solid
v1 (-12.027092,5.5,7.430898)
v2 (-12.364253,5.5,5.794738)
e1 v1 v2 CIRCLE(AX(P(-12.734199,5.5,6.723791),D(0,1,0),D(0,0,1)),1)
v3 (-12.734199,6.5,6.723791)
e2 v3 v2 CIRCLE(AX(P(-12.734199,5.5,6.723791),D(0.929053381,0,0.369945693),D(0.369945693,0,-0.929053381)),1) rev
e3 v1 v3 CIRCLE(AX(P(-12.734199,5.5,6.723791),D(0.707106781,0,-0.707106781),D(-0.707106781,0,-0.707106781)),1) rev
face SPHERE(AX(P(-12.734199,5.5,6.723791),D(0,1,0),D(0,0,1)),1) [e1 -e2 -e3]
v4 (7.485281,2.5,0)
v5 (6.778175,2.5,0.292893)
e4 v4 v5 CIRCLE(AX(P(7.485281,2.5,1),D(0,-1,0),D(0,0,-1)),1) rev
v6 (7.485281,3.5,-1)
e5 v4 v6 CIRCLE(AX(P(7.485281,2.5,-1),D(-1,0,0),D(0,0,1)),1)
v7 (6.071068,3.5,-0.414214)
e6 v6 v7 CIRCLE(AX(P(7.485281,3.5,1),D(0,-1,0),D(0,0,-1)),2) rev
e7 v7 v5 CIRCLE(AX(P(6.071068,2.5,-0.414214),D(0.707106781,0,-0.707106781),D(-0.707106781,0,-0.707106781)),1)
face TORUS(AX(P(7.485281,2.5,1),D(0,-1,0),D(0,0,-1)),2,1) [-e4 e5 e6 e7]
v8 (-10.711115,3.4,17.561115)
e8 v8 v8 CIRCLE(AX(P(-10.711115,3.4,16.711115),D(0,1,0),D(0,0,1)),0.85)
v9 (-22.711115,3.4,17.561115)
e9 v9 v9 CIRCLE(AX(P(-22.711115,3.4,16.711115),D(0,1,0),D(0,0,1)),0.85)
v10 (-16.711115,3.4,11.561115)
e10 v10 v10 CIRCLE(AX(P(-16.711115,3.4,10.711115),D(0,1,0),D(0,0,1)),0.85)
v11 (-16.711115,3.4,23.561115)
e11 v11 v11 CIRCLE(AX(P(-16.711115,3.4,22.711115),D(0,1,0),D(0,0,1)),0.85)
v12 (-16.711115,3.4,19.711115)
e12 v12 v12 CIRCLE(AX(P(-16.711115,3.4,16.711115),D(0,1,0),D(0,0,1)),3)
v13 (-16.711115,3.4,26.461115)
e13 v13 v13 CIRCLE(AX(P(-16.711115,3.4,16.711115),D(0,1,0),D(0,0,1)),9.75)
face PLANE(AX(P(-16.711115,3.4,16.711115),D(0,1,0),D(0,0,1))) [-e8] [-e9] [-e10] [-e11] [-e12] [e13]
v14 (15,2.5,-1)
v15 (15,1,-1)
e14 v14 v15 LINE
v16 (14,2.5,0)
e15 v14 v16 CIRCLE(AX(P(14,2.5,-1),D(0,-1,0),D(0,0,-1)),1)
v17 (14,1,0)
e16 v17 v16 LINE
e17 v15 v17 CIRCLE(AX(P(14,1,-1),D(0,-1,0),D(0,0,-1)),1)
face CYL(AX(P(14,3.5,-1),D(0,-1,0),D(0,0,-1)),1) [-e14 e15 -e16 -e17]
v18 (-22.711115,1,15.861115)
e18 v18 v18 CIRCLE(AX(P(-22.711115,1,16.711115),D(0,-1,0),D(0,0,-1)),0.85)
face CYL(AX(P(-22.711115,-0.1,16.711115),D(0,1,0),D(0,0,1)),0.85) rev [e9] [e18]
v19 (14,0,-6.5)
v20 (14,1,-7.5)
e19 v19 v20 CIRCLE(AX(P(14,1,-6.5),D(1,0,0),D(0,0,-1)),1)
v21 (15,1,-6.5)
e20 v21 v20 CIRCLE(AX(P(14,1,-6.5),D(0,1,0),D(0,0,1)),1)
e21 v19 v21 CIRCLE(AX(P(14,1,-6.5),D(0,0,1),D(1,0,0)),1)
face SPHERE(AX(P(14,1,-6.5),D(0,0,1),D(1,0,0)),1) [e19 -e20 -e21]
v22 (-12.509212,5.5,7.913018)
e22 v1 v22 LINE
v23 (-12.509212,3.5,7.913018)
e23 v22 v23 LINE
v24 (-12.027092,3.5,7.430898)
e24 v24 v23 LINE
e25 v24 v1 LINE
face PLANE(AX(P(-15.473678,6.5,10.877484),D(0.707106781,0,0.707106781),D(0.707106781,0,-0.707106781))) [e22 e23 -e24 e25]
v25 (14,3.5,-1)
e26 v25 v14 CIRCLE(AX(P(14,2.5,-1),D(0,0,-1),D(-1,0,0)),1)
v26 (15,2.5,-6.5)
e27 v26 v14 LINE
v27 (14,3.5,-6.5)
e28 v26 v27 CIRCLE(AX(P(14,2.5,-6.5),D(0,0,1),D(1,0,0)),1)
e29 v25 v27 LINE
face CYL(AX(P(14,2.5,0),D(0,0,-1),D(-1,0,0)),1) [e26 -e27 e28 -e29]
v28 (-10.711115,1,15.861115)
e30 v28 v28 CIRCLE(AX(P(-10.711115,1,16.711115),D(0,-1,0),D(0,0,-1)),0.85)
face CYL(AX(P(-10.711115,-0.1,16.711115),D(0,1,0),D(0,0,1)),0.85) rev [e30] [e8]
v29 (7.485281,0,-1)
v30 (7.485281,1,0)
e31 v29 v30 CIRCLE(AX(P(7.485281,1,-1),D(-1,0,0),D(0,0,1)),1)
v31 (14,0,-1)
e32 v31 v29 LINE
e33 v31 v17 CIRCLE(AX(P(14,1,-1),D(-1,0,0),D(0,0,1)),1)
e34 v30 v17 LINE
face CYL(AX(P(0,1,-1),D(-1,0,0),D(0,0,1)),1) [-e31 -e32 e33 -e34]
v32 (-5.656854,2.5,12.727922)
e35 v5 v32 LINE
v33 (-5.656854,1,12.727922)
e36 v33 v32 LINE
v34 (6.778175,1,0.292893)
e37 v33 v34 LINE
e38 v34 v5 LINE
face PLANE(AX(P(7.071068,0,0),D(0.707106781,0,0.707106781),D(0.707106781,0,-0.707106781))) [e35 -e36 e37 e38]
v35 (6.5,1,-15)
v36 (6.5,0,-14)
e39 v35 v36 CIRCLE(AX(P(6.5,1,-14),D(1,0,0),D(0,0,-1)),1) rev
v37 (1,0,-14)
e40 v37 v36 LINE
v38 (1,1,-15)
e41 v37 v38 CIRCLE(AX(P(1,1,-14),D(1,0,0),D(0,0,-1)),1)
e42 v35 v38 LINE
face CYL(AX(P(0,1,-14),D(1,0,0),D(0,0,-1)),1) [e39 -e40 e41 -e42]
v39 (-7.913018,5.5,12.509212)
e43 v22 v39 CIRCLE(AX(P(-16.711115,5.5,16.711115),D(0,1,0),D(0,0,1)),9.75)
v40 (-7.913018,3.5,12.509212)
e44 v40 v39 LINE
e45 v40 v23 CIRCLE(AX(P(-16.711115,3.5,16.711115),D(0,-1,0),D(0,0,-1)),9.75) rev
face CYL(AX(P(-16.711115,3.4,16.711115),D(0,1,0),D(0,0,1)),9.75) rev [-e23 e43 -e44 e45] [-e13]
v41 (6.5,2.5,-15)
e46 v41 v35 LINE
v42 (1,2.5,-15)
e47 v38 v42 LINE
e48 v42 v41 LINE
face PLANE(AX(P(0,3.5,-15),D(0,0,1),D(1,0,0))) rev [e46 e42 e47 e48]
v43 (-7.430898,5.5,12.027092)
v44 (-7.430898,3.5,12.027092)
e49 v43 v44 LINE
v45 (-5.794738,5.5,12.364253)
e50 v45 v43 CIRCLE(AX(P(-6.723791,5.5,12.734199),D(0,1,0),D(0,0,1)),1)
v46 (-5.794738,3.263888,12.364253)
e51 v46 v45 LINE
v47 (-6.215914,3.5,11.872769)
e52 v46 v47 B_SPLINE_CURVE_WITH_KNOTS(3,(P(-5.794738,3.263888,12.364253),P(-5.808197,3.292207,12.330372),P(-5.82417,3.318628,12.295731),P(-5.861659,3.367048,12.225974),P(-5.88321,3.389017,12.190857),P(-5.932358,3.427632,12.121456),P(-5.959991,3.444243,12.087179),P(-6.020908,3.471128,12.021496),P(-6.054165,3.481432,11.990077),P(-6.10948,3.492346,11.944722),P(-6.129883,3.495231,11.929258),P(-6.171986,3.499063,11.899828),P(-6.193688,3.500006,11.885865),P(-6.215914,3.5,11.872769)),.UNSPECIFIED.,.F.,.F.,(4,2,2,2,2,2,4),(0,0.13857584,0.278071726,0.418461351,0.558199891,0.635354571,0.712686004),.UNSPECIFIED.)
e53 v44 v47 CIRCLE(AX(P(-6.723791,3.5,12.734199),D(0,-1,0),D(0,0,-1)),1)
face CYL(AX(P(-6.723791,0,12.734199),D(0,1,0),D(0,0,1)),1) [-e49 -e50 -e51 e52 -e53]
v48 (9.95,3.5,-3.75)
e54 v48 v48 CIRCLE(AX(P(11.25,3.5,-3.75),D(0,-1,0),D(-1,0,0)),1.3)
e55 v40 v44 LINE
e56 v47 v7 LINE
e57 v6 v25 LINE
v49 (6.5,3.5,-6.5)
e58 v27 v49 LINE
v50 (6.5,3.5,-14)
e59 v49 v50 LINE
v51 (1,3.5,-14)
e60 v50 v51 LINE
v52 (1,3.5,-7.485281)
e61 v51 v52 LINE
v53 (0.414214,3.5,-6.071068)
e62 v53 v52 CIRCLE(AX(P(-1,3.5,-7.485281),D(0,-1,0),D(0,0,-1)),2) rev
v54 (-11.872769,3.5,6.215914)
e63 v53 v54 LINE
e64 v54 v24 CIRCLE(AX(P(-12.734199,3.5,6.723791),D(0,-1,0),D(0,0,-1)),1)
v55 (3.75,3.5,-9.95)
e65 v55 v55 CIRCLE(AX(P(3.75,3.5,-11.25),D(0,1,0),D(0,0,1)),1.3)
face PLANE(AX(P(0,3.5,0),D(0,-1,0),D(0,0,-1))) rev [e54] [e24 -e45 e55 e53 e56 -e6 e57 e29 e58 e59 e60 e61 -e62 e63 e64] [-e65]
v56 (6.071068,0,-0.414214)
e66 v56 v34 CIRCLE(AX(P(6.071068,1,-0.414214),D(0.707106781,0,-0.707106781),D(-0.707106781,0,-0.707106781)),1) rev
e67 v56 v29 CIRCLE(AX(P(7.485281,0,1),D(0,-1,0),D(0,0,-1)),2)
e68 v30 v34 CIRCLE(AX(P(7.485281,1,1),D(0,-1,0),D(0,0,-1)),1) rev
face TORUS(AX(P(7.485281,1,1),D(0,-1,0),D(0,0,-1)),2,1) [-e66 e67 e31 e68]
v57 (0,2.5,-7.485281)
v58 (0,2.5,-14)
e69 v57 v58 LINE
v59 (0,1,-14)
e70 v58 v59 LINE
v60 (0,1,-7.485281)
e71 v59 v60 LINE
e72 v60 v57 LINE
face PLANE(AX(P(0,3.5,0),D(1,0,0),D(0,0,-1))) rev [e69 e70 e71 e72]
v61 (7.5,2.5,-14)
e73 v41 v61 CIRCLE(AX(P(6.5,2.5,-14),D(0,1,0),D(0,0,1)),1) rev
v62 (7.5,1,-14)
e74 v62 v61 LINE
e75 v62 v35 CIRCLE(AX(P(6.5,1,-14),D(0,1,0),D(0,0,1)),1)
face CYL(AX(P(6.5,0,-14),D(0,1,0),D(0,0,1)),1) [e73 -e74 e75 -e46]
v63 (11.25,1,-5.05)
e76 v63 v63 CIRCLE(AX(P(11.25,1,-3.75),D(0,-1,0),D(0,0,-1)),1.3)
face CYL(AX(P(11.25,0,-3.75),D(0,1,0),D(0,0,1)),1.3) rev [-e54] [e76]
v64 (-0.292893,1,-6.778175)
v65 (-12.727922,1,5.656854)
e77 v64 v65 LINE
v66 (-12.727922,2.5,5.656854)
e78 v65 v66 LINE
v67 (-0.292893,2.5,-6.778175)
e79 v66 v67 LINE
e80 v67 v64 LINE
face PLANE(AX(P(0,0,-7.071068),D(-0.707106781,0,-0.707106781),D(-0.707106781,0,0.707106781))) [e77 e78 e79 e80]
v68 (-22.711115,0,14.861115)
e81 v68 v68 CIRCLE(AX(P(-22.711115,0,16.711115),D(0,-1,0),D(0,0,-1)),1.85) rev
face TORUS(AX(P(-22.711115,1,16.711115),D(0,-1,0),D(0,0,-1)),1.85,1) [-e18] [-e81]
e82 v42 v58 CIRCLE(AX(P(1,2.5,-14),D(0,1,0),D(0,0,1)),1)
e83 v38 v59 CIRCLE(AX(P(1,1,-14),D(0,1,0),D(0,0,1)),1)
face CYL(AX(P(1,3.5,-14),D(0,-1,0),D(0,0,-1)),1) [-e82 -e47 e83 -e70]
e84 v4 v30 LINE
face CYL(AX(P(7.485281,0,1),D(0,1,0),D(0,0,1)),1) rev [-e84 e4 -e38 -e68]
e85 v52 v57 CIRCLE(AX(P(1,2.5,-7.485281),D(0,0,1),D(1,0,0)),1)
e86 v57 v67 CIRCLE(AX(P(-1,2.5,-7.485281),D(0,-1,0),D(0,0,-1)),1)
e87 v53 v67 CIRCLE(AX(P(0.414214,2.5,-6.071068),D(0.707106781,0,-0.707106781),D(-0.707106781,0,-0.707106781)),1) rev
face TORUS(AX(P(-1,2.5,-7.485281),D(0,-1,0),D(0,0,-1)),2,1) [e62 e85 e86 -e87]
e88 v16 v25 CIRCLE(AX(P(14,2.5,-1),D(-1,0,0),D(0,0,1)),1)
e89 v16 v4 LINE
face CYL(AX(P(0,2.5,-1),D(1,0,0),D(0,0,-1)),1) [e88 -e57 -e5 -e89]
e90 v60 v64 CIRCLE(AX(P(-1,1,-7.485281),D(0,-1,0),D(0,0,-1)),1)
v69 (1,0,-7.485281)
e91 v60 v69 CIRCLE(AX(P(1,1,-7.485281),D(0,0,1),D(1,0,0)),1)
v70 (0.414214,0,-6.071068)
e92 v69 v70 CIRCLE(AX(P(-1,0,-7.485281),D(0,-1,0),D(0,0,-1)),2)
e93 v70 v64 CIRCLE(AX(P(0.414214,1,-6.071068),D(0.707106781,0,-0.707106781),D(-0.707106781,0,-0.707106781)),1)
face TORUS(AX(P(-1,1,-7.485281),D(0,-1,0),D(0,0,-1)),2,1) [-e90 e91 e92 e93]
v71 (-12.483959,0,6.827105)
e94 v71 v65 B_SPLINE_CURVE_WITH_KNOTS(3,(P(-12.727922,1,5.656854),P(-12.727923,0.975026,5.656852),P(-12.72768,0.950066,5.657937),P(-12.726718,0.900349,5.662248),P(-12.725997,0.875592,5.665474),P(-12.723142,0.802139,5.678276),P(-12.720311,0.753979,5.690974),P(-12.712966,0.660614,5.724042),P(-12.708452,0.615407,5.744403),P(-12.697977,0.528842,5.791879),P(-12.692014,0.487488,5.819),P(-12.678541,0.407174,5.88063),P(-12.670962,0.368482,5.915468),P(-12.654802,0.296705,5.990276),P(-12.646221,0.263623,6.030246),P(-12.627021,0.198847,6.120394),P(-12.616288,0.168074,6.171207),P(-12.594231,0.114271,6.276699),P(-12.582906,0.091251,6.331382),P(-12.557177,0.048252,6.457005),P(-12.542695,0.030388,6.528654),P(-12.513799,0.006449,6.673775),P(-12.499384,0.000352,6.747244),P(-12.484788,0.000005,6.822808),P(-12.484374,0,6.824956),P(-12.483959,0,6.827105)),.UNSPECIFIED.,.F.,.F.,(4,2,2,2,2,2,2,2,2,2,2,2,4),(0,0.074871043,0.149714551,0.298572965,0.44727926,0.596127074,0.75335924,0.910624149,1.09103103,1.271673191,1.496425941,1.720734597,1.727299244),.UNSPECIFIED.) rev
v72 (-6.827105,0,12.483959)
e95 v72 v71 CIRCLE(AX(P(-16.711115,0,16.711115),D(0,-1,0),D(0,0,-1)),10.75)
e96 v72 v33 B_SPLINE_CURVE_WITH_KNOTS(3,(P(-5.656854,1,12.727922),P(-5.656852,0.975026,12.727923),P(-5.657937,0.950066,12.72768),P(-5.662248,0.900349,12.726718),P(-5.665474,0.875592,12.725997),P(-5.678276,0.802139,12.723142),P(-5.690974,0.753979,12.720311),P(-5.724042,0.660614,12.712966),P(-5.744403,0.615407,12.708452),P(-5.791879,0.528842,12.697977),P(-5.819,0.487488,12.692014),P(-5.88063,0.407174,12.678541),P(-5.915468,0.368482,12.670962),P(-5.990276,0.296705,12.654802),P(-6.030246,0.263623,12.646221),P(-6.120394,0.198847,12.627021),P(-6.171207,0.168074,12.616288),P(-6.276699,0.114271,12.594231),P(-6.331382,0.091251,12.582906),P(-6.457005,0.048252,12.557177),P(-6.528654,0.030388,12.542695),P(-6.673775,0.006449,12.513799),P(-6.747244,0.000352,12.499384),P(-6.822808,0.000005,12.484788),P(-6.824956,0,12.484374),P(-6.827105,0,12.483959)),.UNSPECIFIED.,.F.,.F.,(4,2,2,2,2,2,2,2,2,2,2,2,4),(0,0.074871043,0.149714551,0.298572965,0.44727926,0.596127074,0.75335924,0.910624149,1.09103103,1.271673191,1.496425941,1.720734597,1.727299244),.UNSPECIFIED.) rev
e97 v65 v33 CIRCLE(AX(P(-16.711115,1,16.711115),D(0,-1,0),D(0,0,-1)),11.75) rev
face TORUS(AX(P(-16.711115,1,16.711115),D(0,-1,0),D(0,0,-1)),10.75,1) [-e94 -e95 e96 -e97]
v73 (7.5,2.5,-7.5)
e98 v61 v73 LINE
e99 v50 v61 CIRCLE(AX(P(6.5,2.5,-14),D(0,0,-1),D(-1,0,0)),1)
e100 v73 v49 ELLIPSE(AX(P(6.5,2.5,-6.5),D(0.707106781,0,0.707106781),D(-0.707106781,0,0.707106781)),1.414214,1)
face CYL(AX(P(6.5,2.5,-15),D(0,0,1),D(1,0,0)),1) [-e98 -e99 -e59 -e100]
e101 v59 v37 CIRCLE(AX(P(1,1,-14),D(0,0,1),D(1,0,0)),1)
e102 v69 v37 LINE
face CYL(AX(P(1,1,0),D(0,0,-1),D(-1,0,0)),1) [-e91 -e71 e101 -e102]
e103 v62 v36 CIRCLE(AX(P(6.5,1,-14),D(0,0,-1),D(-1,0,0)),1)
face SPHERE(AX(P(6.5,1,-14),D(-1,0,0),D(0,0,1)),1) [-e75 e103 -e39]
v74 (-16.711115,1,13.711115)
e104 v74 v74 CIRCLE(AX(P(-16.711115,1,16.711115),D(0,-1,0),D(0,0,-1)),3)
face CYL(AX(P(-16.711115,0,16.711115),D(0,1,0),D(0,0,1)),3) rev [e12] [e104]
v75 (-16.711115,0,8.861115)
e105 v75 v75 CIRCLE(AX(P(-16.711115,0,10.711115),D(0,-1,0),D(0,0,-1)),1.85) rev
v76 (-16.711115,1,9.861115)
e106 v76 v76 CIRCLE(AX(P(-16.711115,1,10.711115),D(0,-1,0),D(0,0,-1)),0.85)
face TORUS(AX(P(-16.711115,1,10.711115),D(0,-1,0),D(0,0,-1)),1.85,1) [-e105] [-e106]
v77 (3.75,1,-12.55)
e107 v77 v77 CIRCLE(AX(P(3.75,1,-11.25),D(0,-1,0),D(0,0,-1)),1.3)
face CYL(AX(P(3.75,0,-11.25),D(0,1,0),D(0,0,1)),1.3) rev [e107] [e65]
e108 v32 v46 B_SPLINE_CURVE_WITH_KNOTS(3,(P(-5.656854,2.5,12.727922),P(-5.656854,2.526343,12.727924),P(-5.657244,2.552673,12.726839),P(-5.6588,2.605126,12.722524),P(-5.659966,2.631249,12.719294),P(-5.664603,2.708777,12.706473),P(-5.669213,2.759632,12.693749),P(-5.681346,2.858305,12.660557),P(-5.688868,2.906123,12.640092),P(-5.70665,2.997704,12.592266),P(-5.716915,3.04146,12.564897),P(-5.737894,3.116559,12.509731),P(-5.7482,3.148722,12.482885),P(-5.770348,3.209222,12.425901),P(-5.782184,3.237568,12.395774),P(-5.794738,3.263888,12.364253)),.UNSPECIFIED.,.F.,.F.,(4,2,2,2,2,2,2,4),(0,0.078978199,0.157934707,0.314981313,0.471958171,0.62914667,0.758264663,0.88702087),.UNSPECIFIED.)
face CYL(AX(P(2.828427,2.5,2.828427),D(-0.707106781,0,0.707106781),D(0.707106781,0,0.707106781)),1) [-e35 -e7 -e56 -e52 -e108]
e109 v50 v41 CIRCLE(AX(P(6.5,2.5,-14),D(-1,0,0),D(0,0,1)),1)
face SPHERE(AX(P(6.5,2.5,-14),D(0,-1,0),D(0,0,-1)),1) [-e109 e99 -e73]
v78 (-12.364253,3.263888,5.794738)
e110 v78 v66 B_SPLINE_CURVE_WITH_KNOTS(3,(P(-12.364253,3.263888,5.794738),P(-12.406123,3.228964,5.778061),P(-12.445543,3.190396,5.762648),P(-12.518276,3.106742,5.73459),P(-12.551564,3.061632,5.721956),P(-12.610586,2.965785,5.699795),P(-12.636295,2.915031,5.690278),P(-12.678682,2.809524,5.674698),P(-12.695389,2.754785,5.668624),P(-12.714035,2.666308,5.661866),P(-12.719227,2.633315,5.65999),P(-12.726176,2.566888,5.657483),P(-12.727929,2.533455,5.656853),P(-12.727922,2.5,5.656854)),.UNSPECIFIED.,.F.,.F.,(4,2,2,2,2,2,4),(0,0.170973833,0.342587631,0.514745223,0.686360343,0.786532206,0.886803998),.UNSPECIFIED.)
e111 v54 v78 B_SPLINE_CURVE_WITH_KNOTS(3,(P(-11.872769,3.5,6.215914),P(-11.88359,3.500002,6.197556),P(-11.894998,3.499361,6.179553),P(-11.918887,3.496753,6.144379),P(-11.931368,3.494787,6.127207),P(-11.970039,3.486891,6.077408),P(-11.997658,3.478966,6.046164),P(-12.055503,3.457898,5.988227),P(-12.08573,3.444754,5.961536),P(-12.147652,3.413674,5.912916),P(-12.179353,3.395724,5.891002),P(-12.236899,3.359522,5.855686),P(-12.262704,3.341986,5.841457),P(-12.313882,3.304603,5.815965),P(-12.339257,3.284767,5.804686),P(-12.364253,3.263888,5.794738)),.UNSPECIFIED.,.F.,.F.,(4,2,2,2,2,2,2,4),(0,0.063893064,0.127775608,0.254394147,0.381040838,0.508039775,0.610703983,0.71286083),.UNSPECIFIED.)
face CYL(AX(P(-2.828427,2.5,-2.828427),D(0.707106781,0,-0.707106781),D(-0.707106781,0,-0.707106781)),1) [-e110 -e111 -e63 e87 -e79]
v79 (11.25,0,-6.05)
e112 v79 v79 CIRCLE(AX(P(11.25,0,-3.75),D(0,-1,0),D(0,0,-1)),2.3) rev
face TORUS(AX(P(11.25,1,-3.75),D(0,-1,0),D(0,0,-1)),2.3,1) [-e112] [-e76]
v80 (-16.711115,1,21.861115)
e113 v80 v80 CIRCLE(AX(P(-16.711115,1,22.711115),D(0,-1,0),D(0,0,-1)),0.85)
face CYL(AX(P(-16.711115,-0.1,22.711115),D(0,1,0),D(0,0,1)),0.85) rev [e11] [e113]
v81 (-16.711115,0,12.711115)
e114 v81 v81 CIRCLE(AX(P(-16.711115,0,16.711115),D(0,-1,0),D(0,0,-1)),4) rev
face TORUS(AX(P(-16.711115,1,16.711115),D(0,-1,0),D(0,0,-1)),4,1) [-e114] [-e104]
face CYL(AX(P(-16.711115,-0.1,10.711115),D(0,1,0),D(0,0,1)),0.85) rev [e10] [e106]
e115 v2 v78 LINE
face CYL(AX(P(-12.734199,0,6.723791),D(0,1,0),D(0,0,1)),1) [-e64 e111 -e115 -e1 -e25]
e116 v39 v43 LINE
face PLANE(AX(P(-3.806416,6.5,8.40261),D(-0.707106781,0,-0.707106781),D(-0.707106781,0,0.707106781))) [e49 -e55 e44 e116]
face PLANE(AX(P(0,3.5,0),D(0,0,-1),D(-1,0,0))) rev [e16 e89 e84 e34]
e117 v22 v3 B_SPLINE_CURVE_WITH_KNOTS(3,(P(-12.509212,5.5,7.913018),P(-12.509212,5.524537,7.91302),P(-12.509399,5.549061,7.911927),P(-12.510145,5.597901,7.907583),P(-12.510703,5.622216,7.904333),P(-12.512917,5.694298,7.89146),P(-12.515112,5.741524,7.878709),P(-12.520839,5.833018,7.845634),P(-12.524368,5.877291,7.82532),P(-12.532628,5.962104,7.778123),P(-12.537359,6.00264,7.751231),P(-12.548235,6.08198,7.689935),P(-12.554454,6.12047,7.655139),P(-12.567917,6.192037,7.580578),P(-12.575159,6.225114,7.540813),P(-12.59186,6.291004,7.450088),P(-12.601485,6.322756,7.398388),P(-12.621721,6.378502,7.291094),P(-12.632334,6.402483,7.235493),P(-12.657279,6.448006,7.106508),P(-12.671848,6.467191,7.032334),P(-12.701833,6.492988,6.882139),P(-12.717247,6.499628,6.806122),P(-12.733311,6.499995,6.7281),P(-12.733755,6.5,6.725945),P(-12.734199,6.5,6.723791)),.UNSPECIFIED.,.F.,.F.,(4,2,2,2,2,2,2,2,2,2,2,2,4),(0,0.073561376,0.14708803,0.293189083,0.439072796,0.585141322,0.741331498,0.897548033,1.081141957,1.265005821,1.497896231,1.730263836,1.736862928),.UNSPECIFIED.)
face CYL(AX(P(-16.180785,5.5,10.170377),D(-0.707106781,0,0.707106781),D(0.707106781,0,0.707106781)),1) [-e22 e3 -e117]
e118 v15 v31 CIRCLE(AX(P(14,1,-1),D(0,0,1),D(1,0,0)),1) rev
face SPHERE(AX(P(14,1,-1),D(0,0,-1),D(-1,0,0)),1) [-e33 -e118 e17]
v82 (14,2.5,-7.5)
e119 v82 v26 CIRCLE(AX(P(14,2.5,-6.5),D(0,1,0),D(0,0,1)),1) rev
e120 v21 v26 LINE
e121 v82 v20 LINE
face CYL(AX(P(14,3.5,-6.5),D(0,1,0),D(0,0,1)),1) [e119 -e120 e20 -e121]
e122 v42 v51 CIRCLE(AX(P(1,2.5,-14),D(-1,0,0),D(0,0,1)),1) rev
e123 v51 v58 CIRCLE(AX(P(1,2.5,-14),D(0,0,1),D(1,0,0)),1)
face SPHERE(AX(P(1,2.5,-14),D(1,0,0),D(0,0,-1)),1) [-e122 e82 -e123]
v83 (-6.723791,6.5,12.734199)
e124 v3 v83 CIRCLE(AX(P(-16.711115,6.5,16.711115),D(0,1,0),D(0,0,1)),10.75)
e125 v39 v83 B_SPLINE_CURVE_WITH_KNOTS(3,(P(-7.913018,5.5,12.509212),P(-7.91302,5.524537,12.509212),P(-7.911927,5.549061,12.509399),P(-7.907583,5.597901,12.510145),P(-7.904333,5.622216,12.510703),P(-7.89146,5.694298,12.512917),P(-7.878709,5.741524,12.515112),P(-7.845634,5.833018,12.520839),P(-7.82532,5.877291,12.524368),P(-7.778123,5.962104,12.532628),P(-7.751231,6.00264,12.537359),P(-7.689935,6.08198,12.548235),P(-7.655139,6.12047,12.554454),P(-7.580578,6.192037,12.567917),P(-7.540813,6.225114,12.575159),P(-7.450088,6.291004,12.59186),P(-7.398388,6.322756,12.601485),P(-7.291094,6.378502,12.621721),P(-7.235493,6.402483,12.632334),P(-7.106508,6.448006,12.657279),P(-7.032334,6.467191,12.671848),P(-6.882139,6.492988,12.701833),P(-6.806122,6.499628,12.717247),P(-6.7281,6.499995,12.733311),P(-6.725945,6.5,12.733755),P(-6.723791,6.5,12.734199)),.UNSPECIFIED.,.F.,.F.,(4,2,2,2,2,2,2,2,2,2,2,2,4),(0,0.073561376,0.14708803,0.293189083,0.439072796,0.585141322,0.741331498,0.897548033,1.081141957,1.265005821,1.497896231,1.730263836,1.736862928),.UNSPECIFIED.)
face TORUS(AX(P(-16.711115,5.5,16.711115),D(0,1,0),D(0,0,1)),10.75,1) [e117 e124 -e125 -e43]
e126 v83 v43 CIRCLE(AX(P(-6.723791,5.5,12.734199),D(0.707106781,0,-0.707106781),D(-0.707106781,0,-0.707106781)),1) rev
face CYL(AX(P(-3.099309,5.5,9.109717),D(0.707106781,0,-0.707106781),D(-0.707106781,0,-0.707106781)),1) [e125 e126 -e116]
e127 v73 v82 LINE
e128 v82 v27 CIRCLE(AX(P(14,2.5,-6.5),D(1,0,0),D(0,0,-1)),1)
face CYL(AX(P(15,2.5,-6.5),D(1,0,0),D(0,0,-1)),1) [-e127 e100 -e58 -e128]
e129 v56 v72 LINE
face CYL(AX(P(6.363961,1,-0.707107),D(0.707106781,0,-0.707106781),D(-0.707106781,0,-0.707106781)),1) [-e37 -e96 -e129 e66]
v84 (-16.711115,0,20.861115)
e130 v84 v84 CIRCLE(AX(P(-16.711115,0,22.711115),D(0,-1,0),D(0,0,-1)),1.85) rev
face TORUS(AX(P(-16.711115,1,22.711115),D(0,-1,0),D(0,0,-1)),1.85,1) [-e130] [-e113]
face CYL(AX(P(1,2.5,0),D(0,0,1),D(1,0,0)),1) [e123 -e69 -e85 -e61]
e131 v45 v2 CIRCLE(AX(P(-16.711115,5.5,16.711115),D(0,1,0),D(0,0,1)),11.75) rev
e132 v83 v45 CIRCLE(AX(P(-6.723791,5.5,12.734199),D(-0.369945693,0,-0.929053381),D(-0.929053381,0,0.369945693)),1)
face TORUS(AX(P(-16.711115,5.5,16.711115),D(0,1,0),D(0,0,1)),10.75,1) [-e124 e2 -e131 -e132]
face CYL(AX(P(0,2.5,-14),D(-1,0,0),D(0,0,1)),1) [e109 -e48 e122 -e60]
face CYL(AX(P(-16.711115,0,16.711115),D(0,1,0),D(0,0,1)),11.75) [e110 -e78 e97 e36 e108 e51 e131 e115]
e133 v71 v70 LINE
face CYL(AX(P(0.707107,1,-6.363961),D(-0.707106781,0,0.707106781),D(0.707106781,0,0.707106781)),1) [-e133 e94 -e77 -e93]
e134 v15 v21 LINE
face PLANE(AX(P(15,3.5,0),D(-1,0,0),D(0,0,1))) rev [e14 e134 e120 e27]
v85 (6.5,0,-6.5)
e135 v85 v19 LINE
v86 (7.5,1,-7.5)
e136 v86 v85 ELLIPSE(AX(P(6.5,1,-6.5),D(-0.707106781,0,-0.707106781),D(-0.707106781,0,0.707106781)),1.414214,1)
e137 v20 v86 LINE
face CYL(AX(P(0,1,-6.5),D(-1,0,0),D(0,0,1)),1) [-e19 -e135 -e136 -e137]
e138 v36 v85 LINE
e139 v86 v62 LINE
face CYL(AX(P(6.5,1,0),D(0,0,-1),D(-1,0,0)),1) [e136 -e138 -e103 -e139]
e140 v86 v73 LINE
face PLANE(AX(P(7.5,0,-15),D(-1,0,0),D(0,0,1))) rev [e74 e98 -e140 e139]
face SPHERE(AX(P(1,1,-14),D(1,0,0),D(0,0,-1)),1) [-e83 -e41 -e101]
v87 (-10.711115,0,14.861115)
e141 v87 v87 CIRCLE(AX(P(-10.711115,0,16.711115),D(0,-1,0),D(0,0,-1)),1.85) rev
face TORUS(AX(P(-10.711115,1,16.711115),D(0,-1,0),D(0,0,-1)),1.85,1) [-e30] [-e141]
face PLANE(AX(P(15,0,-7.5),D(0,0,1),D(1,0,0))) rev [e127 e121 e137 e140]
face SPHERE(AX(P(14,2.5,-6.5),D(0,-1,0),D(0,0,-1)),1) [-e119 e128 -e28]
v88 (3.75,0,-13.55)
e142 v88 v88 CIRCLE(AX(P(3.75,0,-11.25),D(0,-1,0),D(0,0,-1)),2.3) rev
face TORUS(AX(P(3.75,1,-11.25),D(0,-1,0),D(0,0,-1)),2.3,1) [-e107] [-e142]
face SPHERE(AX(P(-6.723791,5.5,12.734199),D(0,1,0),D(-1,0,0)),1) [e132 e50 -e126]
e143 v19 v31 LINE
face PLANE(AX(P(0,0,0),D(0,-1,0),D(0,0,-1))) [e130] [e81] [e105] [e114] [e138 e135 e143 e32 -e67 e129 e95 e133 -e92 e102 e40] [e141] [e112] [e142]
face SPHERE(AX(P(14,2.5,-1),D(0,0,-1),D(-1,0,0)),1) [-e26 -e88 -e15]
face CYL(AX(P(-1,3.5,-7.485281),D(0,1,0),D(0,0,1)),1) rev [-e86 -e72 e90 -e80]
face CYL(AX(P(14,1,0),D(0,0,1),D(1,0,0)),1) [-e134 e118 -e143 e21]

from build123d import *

# Parameters (mm, degrees)
SKETCH1_W           = 15
SKETCH1_H           = 15
BOSS_EXTRUDE1_DEPTH = 3.5
SKETCH2_W           = 7.5
SKETCH2_H           = 7.5
CUT_EXTRUDE1_DEPTH  = 22.5
SKETCH3_R           = 1.3
CUT_EXTRUDE2_DEPTH  = 22.5
BOSS_EXTRUDE3_DEPTH = 3.5
SKETCH7_R           = 11.75
BOSS_EXTRUDE4_DEPTH = 3.5
BOSS_EXTRUDE5_START = 3
SKETCH8_R           = 11.75
BOSS_EXTRUDE5_DEPTH = 3
SKETCH9_R           = 9.75
CUT_EXTRUDE3_DEPTH  = 3.1
FILLET8_R           = 1
FILLET9_R           = 1
SKETCH12_R          = 3
CUT_EXTRUDE6_DEPTH  = 41.393441406
FILLET23_R          = 1
FILLET24_R          = 1
FILLET25_R          = 1
CUT_EXTRUDE7_DEPTH  = 41.401981494
FILLET31_R          = 1
FILLET32_R          = 1
SKETCH30_R          = 0.85
CUT_EXTRUDE8_DEPTH  = 3.5
FILLET33_R          = 1


with BuildPart() as part:
    # Sketch1 → Boss-Extrude1 (new body)
    with BuildSketch(Plane(origin=(0, 0, 0), x_dir=(1, 0, 0), z_dir=(0, 1, 0))):
        with Locations((7.5, 7.5)):
            Rectangle(SKETCH1_W, SKETCH1_H)
    extrude(amount=BOSS_EXTRUDE1_DEPTH)

    # Sketch2 → Cut-Extrude1 (cut, through all)
    with BuildSketch(Plane(origin=(0, 3.5, 0), x_dir=(1, 0, 0), z_dir=(0, 1, 0))):
        with Locations((11.25, 11.25)):
            Rectangle(SKETCH2_W, SKETCH2_H)
    extrude(amount=-CUT_EXTRUDE1_DEPTH, mode=Mode.SUBTRACT)

    # Sketch3 → Cut-Extrude2 (cut, through all)
    with BuildSketch(Plane(origin=(0, 3.5, 0), x_dir=(1, 0, 0), z_dir=(0, 1, 0))):
        with Locations(Location((3.75, 11.25, 0), (0, 0, 270))):
            Circle(SKETCH3_R)
    cut_extrude2 = extrude(amount=-CUT_EXTRUDE2_DEPTH, mode=Mode.SUBTRACT)

    # Mirror1: Cut-Extrude2 across plane
    add(cut_extrude2.mirror(Plane(origin=(0, 0, 0), x_dir=(-0.7071067811865475, 0, 0.7071067811865476), z_dir=(0.7071067811865478, 0, 0.7071067811865474))), mode=Mode.SUBTRACT)

    # Sketch6 → Boss-Extrude3 (add)
    with BuildSketch(Plane(origin=(0, 3.5, 0), x_dir=(1, 0, 0), z_dir=(0, 1, 0))):
        Polygon((0, 7.071067812), (-12.727922061, -5.656854249), (-5.656854249, -12.727922061), (7.071067812, 0), align=None)
    extrude(amount=-BOSS_EXTRUDE3_DEPTH)

    # Sketch7 → Boss-Extrude4 (add)
    with BuildSketch(Plane(origin=(0, 3.5, 0), x_dir=(1, 0, 0), z_dir=(0, 1, 0))):
        with Locations((-16.711114776, -16.711114776)):
            Circle(SKETCH7_R)
    extrude(amount=-BOSS_EXTRUDE4_DEPTH)

    # Sketch8 → Boss-Extrude5 (add)
    with BuildSketch(Plane(origin=(0, 3.5, 0), x_dir=(1, 0, 0), z_dir=(0, 1, 0)).offset(BOSS_EXTRUDE5_START)):
        with Locations(Location((-16.711114776, -16.711114776, 0), (0, 0, 270))):
            Circle(SKETCH8_R)
    extrude(amount=-BOSS_EXTRUDE5_DEPTH)

    # Sketch9 → Cut-Extrude3 (cut)
    with BuildSketch(Plane(origin=(0, 6.5, 0), x_dir=(1, 0, 0), z_dir=(0, 1, 0))):
        with Locations(Location((-16.711114776, -16.711114776, 0), (0, 0, 270))):
            Circle(SKETCH9_R)
    extrude(amount=-CUT_EXTRUDE3_DEPTH, mode=Mode.SUBTRACT)

    # Fillet8
    fillet8_edges = [part.edges().sort_by_distance(p)[0] for p in [
        (15, 0, -3.75),
    ]]
    fillet(fillet8_edges, radius=FILLET8_R)

    # Fillet9
    fillet9_edges = [part.edges().sort_by_distance(p)[0] for p in [
        (3.75, 0, -15),
    ]]
    fillet(fillet9_edges, radius=FILLET9_R)

    # Sketch12 → Cut-Extrude6 (cut, through all)
    with BuildSketch(Plane(origin=(0, 3.4, 0), x_dir=(1, 0, 0), z_dir=(0, 1, 0))):
        with Locations(Location((-16.711114776, -16.711114776, 0), (0, 0, 270))):
            Circle(SKETCH12_R)
    extrude(amount=-CUT_EXTRUDE6_DEPTH, mode=Mode.SUBTRACT)

    # Fillet23
    fillet23_edges = [part.edges().sort_by_distance(p)[0] for p in [
        (7.5, 2.25, -15),
        (7.5, 0, -10.75),
        (7.5, 0.292893219, -14.707106781),
    ]]
    fillet(fillet23_edges, radius=FILLET23_R)

    # Fillet24
    fillet24_edges = [part.edges().sort_by_distance(p)[0] for p in [
        (10.25, 0, -7.5),
        (15, 2.25, -7.5),
        (14.707106781, 0.292893219, -7.5),
    ]]
    fillet(fillet24_edges, radius=FILLET24_R)

    # Fillet25
    fillet25_edges = [part.edges().sort_by_distance(p)[0] for p in [
        (14.707106781, 3.5, -7.207106781),
        (15, 3.5, -3.25),
        (10.75, 3.5, -7.5),
    ]]
    fillet(fillet25_edges, radius=FILLET25_R)

    # Sketch27 → Cut-Extrude7 (cut, through all)
    with BuildSketch(Plane(origin=(0, 3.5, 0), x_dir=(1, 0, 0), z_dir=(0, 1, 0))):
        Polygon((-8.402610097, -3.80641602), (-3.80641602, -8.402610097), (-10.877483832, -15.473677909), (-15.473677909, -10.877483831), align=None)
    extrude(amount=CUT_EXTRUDE7_DEPTH, mode=Mode.SUBTRACT)

    # Fillet31
    fillet31_edges = [part.edges().sort_by_distance(p)[0] for p in [
        (3.25, 3.5, -15),
        (7.207106781, 3.5, -14.707106781),
        (7.5, 3.5, -10.25),
    ]]
    fillet(fillet31_edges, radius=FILLET31_R)

    # Fillet32
    fillet32_edges = [part.edges().sort_by_distance(p)[0] for p in [
        (-26.220161682, 6.5, 14.556926545),
        (-25.019619455, 6.5, 25.019619455),
        (-11.024852104, 5, 6.428658026),
        (-6.428658026, 5, 11.024852104),
        (-7.170837882, 6.5, 11.767031959),
        (-11.767031959, 6.5, 7.170837882),
    ]]
    fillet(fillet32_edges, radius=FILLET32_R - 0.0001)  # a hair under: the kernel refuses the full size

    # Sketch30 → Cut-Extrude8 (cut)
    with BuildSketch(Plane(origin=(0, 3.4, 0), x_dir=(1, 0, 0), z_dir=(0, 1, 0))):
        with Locations(Location((-16.711114776, -10.711114776, 0), (0, 0, 270))):
            Circle(SKETCH30_R)
        with Locations(Location((-10.711114776, -16.711114776, 0), (0, 0, 270))):
            Circle(SKETCH30_R)
        with Locations(Location((-16.711114776, -22.711114776, 0), (0, 0, 270))):
            Circle(SKETCH30_R)
        with Locations(Location((-22.711114776, -16.711114776, 0), (0, 0, 270))):
            Circle(SKETCH30_R)
    extrude(amount=-CUT_EXTRUDE8_DEPTH, mode=Mode.SUBTRACT)

    # Fillet33
    fillet33_edges = [part.edges().sort_by_distance(p)[0] for p in [
        (-6.363961031, 3.5, -0.707106781),
        (-6.363961031, 0, -0.707106781),
        (0, 3.5, -10.535533906),
        (0, 3.207106781, -14.707106781),
        (0, 1.75, -15),
        (0, 0.292893219, -14.707106781),
        (14.707106781, 0.292893219, 0),
        (15, 1.75, 0),
        (14.707106781, 3.207106781, 0),
        (3.75, 0, -12.55),
        (12.55, 0, -3.75),
        (0, 0, -10.535533906),
        (-25.019619455, 0, 25.019619455),
        (10.535533906, 0, 0),
        (-16.711114776, 0, 13.711114776),
        (0, 1.75, -7.071067812),
        (7.071067812, 1.75, 0),
        (0.707106781, 3.5, 6.363961031),
        (0.707106781, 0, 6.363961031),
        (10.535533906, 3.5, 0),
        (-22.711114776, 0, 15.861114776),
        (-16.711114776, 0, 21.861114776),
        (-10.711114776, 0, 15.861114776),
        (-16.711114776, 0, 9.861114776),
    ]]
    fillet(fillet33_edges, radius=FILLET33_R)


solid = part.part
